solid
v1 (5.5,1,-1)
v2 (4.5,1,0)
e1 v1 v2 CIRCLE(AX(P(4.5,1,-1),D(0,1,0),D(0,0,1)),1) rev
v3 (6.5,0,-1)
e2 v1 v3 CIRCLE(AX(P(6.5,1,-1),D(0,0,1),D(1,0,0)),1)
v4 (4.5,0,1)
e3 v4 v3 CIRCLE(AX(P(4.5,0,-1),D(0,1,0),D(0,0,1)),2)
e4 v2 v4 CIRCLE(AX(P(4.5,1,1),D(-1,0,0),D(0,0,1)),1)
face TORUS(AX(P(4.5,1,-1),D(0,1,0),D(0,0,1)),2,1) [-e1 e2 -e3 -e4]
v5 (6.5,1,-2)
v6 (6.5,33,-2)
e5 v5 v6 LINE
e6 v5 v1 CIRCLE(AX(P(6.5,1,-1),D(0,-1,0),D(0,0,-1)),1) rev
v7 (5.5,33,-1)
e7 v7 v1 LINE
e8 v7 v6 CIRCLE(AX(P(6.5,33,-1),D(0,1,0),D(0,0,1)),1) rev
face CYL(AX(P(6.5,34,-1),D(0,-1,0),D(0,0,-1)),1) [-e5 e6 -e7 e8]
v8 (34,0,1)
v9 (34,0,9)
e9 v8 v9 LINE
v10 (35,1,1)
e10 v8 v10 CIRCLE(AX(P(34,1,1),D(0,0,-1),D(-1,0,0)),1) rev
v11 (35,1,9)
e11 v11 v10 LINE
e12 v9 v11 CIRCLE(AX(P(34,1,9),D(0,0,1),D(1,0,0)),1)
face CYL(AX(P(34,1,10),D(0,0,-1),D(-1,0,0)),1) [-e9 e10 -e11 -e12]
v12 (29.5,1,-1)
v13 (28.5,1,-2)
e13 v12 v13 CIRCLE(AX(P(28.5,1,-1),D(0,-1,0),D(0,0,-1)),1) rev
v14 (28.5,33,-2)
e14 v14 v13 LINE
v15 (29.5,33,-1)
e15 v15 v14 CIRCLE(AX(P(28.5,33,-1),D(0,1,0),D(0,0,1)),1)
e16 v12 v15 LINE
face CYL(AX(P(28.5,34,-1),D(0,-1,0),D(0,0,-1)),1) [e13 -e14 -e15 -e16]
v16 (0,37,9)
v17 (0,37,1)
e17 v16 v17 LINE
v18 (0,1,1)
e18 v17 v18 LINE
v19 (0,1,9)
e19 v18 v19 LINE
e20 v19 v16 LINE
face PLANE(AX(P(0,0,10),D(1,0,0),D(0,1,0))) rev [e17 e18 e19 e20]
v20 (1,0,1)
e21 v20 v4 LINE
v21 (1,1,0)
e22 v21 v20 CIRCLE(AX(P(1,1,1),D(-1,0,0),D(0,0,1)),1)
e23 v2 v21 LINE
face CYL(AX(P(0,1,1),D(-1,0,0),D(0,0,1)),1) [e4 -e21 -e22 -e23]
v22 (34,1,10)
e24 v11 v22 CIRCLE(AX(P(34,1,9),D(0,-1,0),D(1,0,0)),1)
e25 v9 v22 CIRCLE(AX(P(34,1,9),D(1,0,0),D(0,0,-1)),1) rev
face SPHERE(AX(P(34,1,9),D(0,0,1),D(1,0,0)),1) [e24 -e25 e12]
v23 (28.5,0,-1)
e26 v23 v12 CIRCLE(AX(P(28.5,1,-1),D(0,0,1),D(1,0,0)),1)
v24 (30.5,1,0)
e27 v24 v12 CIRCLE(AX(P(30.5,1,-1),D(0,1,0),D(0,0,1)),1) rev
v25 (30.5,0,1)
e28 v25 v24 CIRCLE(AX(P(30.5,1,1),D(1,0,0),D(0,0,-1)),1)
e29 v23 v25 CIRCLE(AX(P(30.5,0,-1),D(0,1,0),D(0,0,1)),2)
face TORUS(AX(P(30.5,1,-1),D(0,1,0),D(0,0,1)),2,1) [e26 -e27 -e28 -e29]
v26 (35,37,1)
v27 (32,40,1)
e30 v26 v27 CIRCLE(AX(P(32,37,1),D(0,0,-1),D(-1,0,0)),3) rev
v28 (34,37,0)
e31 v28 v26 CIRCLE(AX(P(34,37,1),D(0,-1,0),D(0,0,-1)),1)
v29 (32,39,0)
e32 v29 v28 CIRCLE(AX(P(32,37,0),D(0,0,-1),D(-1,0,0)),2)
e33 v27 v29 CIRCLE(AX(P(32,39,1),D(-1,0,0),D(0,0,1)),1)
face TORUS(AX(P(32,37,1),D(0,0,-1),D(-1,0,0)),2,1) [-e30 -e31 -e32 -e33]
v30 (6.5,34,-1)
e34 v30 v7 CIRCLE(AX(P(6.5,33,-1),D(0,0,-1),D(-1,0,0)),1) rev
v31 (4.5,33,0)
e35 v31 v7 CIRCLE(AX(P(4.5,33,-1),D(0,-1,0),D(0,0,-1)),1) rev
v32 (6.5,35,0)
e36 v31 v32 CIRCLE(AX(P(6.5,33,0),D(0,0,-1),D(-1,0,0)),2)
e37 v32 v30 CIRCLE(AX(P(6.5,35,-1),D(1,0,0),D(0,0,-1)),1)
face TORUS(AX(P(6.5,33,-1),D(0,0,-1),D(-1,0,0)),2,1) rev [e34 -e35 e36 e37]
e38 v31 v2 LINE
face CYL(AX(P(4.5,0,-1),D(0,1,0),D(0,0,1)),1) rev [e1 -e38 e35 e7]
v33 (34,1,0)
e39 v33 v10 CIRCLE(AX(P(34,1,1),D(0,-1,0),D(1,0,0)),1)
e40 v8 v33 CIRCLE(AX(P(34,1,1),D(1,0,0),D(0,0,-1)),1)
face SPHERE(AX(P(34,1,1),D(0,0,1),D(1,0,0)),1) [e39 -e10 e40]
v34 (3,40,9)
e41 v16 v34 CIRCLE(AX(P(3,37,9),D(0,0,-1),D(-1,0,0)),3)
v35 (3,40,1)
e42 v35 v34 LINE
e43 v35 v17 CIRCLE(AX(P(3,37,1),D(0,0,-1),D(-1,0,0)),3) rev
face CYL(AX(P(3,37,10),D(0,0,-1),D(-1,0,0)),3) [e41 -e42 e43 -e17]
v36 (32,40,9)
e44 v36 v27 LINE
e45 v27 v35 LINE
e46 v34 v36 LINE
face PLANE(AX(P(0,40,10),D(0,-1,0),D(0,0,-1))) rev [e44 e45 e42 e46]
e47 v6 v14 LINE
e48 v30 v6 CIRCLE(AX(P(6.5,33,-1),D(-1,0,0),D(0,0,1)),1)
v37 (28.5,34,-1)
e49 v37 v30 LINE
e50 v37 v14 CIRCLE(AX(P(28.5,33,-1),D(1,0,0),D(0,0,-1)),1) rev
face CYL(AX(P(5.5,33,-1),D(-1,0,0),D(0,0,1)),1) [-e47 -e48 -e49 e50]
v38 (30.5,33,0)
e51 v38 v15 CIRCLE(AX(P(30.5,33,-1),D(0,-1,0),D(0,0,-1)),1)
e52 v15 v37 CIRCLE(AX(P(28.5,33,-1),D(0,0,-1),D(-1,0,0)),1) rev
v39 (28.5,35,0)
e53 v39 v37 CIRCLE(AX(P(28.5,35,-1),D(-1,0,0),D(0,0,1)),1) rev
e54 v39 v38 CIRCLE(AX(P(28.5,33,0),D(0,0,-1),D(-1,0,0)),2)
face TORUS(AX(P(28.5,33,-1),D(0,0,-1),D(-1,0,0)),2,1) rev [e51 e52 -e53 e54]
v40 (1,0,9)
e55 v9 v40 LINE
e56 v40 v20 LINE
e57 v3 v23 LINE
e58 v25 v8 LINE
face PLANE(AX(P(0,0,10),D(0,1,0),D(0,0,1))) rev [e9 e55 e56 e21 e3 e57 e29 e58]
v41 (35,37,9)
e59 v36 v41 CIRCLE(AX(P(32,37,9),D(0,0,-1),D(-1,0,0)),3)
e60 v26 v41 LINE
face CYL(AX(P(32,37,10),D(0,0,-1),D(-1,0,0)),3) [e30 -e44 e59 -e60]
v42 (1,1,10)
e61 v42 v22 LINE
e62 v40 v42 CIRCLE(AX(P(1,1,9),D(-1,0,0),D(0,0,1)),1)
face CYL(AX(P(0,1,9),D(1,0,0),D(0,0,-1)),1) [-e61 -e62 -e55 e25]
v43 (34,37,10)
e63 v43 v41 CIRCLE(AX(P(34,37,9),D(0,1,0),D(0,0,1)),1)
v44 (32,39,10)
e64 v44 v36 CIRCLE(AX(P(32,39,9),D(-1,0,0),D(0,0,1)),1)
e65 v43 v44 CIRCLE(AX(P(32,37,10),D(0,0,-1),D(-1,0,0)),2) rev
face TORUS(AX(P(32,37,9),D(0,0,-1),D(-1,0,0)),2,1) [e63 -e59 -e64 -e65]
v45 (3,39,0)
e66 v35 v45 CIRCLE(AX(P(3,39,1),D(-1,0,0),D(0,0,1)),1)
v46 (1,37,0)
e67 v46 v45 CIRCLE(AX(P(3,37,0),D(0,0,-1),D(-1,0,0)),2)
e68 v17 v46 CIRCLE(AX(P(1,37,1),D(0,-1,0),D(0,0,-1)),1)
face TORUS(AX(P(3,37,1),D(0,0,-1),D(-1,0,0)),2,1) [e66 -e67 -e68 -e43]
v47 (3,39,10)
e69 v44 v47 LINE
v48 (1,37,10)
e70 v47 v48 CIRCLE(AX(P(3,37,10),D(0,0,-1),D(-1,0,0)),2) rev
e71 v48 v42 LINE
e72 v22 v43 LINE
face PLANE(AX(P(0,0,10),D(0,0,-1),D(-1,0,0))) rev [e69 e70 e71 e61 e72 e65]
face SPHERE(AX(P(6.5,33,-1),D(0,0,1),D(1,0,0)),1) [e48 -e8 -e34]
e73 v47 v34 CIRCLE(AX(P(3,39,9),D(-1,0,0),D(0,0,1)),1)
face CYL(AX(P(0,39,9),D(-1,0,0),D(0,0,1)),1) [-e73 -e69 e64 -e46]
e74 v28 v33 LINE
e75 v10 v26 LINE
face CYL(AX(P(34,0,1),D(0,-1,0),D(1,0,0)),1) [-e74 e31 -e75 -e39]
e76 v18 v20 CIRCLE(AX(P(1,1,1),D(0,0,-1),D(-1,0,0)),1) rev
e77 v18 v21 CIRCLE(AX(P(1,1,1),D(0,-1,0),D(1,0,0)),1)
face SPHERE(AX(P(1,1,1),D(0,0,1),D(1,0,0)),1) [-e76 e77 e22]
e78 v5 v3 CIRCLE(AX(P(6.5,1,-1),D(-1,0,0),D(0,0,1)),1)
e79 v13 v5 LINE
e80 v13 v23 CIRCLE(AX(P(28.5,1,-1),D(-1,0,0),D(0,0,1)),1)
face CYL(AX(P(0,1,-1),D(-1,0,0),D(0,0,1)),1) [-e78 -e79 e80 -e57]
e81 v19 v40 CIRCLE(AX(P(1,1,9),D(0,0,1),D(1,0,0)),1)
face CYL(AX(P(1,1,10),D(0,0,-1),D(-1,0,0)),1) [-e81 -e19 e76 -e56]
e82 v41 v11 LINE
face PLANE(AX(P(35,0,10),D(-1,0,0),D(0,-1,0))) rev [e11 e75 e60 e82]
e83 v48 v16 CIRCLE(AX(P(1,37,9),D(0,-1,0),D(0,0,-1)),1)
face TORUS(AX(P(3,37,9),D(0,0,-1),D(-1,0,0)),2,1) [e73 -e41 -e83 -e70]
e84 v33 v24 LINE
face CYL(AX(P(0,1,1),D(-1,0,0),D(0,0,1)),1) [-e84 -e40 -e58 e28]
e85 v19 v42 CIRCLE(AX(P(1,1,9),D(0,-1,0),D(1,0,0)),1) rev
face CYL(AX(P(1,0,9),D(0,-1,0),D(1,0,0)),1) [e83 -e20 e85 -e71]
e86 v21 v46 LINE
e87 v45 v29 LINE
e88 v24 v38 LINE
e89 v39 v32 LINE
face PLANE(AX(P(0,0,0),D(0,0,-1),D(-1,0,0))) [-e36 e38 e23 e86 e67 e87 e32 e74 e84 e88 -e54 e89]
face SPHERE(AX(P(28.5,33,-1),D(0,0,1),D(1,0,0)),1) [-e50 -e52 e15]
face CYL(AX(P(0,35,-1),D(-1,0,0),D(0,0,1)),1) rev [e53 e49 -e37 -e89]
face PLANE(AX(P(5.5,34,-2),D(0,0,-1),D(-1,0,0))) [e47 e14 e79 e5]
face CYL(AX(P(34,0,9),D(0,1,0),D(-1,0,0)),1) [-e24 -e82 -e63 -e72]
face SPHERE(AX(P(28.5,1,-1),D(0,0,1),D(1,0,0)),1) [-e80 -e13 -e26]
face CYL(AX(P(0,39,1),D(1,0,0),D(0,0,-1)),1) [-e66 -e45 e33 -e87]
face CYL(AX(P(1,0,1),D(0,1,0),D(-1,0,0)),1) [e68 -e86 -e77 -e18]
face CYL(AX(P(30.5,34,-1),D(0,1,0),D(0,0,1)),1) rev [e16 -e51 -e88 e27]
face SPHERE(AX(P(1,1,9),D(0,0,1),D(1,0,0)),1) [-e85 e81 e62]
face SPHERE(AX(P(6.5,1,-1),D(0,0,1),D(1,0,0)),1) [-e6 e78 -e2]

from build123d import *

# Parameters (mm, degrees)
SKETCH1_W           = 35
SKETCH1_H           = 40
BOSS_EXTRUDE1_DEPTH = 10
FILLET1_R           = 3
SKETCH2_W           = 24
SKETCH2_H           = 2
BOSS_EXTRUDE2_DEPTH = 34
FILLET2_R           = 1
FILLET3_R           = 1


with BuildPart() as part:
    # Sketch1 → Boss-Extrude1 (new body)
    with BuildSketch(Plane.XY):
        with Locations((17.5, 20)):
            Rectangle(SKETCH1_W, SKETCH1_H)
    extrude(amount=BOSS_EXTRUDE1_DEPTH)

    # Fillet1
    fillet1_edges = [part.edges().sort_by_distance(p)[0] for p in [
        (0, 40, 5),
        (35, 40, 5),
    ]]
    fillet(fillet1_edges, radius=FILLET1_R)

    # Sketch2 → Boss-Extrude2 (add)
    with BuildSketch(Plane.XZ):
        with Locations((17.5, -1)):
            Rectangle(SKETCH2_W, SKETCH2_H)
    extrude(amount=-BOSS_EXTRUDE2_DEPTH)

    # Fillet2
    fillet2_edges = [part.edges().sort_by_distance(p)[0] for p in [
        (5.5, 34, -1),
        (5.5, 17, -2),
        (17.5, 34, 0),
        (5.5, 17, 0),
        (29.5, 34, -1),
        (29.5, 17, 0),
        (17.5, 34, -2),
        (29.5, 17, -2),
    ]]
    fillet(fillet2_edges, radius=FILLET2_R - 0.0001)  # a hair under: the kernel refuses the full size

    # Fillet3
    fillet3_edges = [part.edges().sort_by_distance(p)[0] for p in [
        (35, 18.5, 10),
        (0, 18.5, 0),
        (0, 18.5, 10),
        (17.5, 40, 0),
        (34.121320344, 39.121320344, 0),
        (0.878679656, 39.121320344, 0),
        (17.5, 40, 10),
        (34.121320344, 39.121320344, 10),
        (0.878679656, 39.121320344, 10),
        (32.74995, 0, 0),
        (17.5, 0, -2),
        (29.207136071, 0, -1.707136071),
        (5.792863929, 0, -1.707136071),
        (5.207136071, 0, -0.292863929),
        (29.792863929, 0, -0.292863929),
        (35, 18.5, 0),
        (2.25005, 0, 0),
        (17.5, 0, 10),
        (35, 0, 5),
        (0, 0, 5),
    ]]
    fillet(fillet3_edges, radius=FILLET3_R - 0.0001)  # a hair under: the kernel refuses the full size


solid = part.part
